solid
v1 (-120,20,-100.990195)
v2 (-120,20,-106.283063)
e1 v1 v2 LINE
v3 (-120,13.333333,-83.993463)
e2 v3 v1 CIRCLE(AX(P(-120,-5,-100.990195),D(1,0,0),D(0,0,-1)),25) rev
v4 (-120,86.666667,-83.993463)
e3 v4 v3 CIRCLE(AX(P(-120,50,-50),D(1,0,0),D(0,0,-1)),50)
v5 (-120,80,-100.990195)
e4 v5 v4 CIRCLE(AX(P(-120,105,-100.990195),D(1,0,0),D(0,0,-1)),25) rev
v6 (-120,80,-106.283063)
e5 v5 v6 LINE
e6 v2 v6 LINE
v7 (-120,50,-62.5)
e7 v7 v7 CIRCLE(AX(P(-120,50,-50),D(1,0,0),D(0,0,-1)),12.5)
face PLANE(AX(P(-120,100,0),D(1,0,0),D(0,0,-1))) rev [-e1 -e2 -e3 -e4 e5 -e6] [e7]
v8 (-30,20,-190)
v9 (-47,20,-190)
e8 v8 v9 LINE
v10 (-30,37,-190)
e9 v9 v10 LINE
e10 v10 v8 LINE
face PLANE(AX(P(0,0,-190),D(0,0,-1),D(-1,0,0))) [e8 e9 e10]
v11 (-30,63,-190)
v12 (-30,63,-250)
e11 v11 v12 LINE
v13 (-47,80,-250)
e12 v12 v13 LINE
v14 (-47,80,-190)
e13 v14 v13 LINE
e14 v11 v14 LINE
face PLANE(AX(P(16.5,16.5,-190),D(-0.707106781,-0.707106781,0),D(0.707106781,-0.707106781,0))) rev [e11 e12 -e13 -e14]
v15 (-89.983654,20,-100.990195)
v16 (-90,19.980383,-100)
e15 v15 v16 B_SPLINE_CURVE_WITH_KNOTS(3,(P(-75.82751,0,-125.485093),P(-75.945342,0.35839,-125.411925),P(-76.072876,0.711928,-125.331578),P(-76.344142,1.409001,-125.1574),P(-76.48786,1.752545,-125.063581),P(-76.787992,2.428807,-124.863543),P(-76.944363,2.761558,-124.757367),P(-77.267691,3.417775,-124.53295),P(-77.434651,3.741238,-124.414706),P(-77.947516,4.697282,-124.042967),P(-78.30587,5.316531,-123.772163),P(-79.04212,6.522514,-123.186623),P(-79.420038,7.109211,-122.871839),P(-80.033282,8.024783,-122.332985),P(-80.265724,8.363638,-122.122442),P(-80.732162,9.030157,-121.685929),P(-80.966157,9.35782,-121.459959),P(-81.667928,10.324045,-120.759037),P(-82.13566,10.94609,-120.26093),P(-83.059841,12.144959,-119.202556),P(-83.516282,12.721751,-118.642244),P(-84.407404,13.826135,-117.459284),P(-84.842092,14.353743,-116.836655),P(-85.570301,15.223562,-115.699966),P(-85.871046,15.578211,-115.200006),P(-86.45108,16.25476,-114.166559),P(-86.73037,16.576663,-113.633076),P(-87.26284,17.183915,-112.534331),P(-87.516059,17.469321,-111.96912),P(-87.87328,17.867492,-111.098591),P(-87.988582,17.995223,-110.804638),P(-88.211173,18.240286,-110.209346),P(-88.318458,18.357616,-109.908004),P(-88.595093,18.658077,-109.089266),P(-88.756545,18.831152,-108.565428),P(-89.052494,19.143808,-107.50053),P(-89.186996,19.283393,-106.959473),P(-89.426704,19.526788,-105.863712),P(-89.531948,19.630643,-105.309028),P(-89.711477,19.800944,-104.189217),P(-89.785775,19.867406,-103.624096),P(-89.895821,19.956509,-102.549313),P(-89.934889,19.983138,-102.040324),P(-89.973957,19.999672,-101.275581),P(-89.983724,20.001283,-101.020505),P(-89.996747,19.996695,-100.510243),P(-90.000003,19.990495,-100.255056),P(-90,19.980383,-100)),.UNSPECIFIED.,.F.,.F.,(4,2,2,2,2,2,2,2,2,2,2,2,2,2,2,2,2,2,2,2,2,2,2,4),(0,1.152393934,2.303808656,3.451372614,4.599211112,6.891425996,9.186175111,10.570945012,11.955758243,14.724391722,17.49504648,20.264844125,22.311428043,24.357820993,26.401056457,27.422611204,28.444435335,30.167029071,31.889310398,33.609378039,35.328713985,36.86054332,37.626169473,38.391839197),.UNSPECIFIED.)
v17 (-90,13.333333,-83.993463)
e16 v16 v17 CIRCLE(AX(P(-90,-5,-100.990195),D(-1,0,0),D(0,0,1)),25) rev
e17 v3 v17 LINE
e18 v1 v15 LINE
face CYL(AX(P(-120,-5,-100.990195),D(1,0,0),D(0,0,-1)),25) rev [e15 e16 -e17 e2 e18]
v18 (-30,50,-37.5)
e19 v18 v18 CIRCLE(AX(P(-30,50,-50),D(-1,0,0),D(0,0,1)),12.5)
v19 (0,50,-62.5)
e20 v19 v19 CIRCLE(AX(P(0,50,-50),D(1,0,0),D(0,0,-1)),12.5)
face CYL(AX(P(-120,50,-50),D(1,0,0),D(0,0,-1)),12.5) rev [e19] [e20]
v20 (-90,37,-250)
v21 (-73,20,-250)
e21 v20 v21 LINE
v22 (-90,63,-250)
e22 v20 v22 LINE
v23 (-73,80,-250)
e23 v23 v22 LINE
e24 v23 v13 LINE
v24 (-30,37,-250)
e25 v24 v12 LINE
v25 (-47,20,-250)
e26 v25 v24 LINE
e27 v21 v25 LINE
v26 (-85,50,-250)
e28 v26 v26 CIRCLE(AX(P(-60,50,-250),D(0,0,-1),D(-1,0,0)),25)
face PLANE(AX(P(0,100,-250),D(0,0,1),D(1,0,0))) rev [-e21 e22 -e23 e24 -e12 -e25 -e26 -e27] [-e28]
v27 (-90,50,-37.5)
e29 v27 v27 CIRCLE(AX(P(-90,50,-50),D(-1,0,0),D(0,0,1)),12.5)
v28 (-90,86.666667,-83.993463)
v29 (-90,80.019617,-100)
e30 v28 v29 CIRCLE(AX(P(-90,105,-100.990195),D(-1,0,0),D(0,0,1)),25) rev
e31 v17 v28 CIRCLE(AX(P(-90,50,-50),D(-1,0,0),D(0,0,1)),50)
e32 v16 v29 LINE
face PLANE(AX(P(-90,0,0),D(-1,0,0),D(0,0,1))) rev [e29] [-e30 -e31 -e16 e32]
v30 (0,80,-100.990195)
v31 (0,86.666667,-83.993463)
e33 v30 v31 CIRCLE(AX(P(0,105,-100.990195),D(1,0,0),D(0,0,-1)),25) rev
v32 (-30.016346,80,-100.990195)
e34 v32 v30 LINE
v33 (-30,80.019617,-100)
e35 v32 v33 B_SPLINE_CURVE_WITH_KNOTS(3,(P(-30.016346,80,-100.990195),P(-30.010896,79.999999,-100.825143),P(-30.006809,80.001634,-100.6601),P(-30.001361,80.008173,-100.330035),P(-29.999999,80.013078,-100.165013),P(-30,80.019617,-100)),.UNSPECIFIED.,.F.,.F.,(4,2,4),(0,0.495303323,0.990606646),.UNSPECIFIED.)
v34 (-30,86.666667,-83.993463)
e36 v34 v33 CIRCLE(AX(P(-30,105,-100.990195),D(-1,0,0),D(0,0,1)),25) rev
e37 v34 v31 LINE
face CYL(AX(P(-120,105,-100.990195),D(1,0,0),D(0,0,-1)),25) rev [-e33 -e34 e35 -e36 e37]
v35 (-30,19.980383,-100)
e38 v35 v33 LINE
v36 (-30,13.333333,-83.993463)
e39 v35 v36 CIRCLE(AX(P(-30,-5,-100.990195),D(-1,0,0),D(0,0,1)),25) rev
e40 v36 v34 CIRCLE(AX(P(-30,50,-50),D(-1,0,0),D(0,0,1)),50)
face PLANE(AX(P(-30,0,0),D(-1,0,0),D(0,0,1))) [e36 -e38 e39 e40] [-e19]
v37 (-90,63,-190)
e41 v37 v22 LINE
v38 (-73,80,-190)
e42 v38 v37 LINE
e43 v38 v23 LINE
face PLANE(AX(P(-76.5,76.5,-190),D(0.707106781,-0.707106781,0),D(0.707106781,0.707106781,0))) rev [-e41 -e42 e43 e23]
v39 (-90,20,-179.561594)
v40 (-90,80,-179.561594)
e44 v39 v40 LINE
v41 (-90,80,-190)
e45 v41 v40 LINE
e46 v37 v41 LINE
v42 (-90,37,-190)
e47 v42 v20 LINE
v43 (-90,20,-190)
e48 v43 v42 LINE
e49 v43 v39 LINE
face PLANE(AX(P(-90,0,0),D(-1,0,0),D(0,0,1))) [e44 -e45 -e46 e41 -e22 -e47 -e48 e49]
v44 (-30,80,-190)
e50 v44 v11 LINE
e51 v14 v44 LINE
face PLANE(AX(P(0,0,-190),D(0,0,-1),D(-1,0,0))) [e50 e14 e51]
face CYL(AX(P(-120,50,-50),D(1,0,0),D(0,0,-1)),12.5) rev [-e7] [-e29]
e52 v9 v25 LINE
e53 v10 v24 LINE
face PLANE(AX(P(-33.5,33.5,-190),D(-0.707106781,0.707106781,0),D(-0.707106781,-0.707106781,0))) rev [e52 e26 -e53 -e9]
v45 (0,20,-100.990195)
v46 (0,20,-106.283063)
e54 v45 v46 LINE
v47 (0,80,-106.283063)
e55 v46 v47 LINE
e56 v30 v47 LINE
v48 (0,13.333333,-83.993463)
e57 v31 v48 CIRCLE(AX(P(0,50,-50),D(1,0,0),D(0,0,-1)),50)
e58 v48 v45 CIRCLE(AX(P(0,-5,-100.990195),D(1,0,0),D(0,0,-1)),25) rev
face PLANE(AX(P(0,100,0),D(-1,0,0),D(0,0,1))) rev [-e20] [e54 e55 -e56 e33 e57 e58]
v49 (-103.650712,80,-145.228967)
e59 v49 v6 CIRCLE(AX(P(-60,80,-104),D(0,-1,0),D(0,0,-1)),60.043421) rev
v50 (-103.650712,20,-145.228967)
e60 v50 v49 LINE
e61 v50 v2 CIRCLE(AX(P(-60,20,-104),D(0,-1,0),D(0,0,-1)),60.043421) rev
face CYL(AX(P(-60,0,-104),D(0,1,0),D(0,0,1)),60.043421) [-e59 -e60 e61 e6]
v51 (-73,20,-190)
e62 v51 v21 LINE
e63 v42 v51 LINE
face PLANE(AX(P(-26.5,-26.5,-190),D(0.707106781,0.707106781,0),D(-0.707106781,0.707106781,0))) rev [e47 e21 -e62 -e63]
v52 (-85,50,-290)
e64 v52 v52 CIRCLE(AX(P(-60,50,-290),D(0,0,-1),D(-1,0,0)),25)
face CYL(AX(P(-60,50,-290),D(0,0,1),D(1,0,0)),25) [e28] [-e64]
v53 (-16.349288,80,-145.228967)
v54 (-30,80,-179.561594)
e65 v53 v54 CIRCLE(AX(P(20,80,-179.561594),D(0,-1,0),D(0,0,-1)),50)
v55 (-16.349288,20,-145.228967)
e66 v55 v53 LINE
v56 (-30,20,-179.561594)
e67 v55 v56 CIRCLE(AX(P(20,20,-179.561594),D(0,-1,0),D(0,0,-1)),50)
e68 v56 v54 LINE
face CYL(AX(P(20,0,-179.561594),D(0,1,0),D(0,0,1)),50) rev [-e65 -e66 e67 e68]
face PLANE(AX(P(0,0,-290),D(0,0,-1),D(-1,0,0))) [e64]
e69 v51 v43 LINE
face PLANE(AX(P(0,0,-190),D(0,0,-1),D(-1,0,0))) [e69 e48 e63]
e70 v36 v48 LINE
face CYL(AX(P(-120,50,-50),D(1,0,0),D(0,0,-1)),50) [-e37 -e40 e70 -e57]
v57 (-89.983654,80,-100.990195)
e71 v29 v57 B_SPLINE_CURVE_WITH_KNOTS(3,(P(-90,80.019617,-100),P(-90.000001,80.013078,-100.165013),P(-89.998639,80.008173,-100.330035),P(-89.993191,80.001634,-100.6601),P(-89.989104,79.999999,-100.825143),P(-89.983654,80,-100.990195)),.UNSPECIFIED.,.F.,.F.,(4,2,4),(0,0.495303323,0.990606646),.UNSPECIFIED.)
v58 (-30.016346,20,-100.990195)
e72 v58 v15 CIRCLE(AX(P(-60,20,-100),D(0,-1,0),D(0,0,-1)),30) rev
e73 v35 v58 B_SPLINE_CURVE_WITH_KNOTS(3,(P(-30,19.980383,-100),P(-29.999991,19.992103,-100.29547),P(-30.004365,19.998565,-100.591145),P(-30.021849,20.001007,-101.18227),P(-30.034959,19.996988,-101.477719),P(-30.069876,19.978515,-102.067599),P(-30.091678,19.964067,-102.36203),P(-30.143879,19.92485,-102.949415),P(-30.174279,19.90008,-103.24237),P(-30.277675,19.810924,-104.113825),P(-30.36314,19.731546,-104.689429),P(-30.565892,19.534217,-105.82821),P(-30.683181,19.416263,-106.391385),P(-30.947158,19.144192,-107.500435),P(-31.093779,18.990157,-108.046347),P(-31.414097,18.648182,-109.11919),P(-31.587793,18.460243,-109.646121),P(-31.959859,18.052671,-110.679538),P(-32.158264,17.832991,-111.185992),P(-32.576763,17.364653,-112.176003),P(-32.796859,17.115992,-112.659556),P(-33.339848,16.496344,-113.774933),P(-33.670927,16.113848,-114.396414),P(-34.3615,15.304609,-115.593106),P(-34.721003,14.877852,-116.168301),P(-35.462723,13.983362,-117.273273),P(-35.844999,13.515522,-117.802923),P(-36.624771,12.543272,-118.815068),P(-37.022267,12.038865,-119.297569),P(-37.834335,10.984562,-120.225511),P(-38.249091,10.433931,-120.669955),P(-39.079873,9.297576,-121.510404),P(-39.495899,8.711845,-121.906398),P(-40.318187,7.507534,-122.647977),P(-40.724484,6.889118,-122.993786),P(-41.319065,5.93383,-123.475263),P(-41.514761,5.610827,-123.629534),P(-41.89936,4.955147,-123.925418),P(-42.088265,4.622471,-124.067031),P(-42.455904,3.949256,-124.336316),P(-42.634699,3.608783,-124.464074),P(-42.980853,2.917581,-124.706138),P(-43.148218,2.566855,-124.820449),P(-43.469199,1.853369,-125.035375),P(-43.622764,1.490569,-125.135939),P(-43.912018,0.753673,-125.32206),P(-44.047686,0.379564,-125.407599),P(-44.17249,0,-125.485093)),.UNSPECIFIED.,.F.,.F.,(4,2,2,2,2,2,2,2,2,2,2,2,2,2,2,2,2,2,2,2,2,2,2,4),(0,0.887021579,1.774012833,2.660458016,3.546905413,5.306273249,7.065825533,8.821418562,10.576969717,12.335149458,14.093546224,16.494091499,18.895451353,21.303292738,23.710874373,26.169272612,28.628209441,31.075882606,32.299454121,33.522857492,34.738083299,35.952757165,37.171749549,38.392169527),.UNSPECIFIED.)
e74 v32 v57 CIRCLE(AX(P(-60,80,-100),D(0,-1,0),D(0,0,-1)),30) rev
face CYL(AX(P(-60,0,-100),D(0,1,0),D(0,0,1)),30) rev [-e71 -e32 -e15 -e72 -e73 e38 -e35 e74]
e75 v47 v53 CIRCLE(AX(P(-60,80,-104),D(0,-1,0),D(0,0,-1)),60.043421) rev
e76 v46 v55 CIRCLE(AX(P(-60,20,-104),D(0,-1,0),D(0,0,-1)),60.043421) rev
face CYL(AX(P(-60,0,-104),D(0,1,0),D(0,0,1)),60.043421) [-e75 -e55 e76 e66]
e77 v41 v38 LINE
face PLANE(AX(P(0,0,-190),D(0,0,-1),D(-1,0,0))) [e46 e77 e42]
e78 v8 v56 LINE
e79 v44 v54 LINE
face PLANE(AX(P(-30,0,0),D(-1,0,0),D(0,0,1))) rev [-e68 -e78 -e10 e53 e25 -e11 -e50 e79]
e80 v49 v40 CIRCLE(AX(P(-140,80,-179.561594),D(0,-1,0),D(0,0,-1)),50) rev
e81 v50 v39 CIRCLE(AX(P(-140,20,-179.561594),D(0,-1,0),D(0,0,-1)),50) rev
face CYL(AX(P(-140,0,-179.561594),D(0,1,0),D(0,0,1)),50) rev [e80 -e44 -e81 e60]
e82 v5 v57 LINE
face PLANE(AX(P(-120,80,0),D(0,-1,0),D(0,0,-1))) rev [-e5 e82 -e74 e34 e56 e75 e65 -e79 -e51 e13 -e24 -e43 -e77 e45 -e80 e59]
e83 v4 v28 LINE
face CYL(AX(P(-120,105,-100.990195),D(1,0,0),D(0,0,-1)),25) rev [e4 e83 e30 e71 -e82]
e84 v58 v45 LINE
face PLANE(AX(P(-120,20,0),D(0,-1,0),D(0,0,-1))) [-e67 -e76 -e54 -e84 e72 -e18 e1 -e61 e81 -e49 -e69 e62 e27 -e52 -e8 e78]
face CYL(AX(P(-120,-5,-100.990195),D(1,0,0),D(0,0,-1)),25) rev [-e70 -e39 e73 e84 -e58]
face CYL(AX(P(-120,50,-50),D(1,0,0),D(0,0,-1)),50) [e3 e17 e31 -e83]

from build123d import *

# Parameters (mm, degrees)
SKETCH1_W           = 120
SKETCH1_H           = 250
BOSS_EXTRUDE2_DEPTH = 100
CUT_EXTRUDE1_DEPTH  = 295.78805946
SKETCH5_R           = 12.5
CUT_EXTRUDE3_DEPTH  = 295.78805946
CUT_EXTRUDE4_DEPTH  = 60
SKETCH6_3_R         = 25
BOSS_EXTRUDE3_DEPTH = 40


with BuildPart() as part:
    # Sketch1 → Boss-Extrude2 (new body)
    with BuildSketch(Plane(origin=(0, 0, 0), x_dir=(1, 0, 0), z_dir=(0, 1, 0))):
        with Locations((-60, 125)):
            Rectangle(SKETCH1_W, SKETCH1_H)
    extrude(amount=BOSS_EXTRUDE2_DEPTH)

    # Sketch4 → Cut-Extrude1 (cut, through all)
    with BuildSketch(Plane(origin=(0, 100, 0), x_dir=(1, 0, 0), z_dir=(0, 1, 0))):
        with BuildLine():
            ThreePointArc((-30, 100), (-60, 130), (-90, 100))
            Line((-90, 100), (-90, 0))
            Line((-90, 0), (-30, 0))
            Line((-30, 0), (-30, 100))
        make_face()
        with BuildLine():
            Line((0, 250), (-30, 250))
            Line((-30, 250), (-30, 179.561593793))
            ThreePointArc((-30, 179.561593793), (-26.46215881, 161.088158847), (-16.349288051, 145.228967063))
            ThreePointArc((-16.349288051, 145.228967063), (-4.636985506, 127.241105931), (0, 106.283063455))
            Line((0, 106.283063455), (0, 250))
        make_face()
        with BuildLine():
            Line((-90, 179.561593793), (-90, 250))
            Line((-90, 250), (-120, 250))
            Line((-120, 250), (-120, 106.283063455))
            ThreePointArc((-120, 106.283063455), (-115.363014494, 127.241105931), (-103.650711949, 145.228967063))
            ThreePointArc((-103.650711949, 145.228967063), (-93.53784119, 161.088158847), (-90, 179.561593793))
        make_face()
    extrude(amount=-CUT_EXTRUDE1_DEPTH, mode=Mode.SUBTRACT)

    # Sketch5 → Cut-Extrude3 (cut, through all)
    with BuildSketch(Plane(origin=(0, 0, 0), x_dir=(0, 0, -1), z_dir=(1, 0, 0))):
        with BuildLine():
            Line((50, 100), (0, 100))
            Line((0, 100), (0, 50))
            ThreePointArc((0, 50), (14.644660941, 85.355339059), (50, 100))
        make_face()
        with BuildLine():
            ThreePointArc((50, 100), (68.257418584, 96.547466813), (83.993463424, 86.666666667))
            ThreePointArc((83.993463424, 86.666666667), (91.861485844, 81.726266594), (100.990195136, 80))
            Line((100.990195136, 80), (250, 80))
            Line((250, 80), (250, 100))
            Line((250, 100), (50, 100))
        make_face()
        with BuildLine():
            ThreePointArc((50.000000014, 0), (14.644660946, 14.644660936), (0, 50))
            Line((0, 50), (0, 0))
            Line((0, 0), (50.000000014, 0))
        make_face()
        with BuildLine():
            ThreePointArc((83.993463424, 13.333333333), (68.25741859, 3.45253319), (50.000000014, 0))
            Line((50.000000014, 0), (250, 0))
            Line((250, 0), (250, 20))
            Line((250, 20), (100.990195136, 20))
            ThreePointArc((100.990195136, 20), (91.861485844, 18.273733406), (83.993463424, 13.333333333))
        make_face()
        with Locations((50, 50)):
            Circle(SKETCH5_R)
    extrude(amount=-CUT_EXTRUDE3_DEPTH, mode=Mode.SUBTRACT)

    # Sketch6 → Cut-Extrude4 (cut)
    with BuildSketch(Plane(origin=(0, 0, -250), x_dir=(-1, 0, 0), z_dir=(0, 0, -1))):
        Polygon((90, 63), (90, 80), (73, 80), align=None)
        Polygon((90, 20), (90, 37), (73, 20), align=None)
        Polygon((30, 63), (47, 80), (30, 80), align=None)
        Polygon((47, 20), (30, 37), (30, 20), align=None)
    extrude(amount=-CUT_EXTRUDE4_DEPTH, mode=Mode.SUBTRACT)

    # Sketch6<3> → Boss-Extrude3 (add)
    with BuildSketch(Plane(origin=(0, 0, -250), x_dir=(-1, 0, 0), z_dir=(0, 0, -1))):
        with Locations((60, 50)):
            Circle(SKETCH6_3_R)
    extrude(amount=BOSS_EXTRUDE3_DEPTH)


solid = part.part
